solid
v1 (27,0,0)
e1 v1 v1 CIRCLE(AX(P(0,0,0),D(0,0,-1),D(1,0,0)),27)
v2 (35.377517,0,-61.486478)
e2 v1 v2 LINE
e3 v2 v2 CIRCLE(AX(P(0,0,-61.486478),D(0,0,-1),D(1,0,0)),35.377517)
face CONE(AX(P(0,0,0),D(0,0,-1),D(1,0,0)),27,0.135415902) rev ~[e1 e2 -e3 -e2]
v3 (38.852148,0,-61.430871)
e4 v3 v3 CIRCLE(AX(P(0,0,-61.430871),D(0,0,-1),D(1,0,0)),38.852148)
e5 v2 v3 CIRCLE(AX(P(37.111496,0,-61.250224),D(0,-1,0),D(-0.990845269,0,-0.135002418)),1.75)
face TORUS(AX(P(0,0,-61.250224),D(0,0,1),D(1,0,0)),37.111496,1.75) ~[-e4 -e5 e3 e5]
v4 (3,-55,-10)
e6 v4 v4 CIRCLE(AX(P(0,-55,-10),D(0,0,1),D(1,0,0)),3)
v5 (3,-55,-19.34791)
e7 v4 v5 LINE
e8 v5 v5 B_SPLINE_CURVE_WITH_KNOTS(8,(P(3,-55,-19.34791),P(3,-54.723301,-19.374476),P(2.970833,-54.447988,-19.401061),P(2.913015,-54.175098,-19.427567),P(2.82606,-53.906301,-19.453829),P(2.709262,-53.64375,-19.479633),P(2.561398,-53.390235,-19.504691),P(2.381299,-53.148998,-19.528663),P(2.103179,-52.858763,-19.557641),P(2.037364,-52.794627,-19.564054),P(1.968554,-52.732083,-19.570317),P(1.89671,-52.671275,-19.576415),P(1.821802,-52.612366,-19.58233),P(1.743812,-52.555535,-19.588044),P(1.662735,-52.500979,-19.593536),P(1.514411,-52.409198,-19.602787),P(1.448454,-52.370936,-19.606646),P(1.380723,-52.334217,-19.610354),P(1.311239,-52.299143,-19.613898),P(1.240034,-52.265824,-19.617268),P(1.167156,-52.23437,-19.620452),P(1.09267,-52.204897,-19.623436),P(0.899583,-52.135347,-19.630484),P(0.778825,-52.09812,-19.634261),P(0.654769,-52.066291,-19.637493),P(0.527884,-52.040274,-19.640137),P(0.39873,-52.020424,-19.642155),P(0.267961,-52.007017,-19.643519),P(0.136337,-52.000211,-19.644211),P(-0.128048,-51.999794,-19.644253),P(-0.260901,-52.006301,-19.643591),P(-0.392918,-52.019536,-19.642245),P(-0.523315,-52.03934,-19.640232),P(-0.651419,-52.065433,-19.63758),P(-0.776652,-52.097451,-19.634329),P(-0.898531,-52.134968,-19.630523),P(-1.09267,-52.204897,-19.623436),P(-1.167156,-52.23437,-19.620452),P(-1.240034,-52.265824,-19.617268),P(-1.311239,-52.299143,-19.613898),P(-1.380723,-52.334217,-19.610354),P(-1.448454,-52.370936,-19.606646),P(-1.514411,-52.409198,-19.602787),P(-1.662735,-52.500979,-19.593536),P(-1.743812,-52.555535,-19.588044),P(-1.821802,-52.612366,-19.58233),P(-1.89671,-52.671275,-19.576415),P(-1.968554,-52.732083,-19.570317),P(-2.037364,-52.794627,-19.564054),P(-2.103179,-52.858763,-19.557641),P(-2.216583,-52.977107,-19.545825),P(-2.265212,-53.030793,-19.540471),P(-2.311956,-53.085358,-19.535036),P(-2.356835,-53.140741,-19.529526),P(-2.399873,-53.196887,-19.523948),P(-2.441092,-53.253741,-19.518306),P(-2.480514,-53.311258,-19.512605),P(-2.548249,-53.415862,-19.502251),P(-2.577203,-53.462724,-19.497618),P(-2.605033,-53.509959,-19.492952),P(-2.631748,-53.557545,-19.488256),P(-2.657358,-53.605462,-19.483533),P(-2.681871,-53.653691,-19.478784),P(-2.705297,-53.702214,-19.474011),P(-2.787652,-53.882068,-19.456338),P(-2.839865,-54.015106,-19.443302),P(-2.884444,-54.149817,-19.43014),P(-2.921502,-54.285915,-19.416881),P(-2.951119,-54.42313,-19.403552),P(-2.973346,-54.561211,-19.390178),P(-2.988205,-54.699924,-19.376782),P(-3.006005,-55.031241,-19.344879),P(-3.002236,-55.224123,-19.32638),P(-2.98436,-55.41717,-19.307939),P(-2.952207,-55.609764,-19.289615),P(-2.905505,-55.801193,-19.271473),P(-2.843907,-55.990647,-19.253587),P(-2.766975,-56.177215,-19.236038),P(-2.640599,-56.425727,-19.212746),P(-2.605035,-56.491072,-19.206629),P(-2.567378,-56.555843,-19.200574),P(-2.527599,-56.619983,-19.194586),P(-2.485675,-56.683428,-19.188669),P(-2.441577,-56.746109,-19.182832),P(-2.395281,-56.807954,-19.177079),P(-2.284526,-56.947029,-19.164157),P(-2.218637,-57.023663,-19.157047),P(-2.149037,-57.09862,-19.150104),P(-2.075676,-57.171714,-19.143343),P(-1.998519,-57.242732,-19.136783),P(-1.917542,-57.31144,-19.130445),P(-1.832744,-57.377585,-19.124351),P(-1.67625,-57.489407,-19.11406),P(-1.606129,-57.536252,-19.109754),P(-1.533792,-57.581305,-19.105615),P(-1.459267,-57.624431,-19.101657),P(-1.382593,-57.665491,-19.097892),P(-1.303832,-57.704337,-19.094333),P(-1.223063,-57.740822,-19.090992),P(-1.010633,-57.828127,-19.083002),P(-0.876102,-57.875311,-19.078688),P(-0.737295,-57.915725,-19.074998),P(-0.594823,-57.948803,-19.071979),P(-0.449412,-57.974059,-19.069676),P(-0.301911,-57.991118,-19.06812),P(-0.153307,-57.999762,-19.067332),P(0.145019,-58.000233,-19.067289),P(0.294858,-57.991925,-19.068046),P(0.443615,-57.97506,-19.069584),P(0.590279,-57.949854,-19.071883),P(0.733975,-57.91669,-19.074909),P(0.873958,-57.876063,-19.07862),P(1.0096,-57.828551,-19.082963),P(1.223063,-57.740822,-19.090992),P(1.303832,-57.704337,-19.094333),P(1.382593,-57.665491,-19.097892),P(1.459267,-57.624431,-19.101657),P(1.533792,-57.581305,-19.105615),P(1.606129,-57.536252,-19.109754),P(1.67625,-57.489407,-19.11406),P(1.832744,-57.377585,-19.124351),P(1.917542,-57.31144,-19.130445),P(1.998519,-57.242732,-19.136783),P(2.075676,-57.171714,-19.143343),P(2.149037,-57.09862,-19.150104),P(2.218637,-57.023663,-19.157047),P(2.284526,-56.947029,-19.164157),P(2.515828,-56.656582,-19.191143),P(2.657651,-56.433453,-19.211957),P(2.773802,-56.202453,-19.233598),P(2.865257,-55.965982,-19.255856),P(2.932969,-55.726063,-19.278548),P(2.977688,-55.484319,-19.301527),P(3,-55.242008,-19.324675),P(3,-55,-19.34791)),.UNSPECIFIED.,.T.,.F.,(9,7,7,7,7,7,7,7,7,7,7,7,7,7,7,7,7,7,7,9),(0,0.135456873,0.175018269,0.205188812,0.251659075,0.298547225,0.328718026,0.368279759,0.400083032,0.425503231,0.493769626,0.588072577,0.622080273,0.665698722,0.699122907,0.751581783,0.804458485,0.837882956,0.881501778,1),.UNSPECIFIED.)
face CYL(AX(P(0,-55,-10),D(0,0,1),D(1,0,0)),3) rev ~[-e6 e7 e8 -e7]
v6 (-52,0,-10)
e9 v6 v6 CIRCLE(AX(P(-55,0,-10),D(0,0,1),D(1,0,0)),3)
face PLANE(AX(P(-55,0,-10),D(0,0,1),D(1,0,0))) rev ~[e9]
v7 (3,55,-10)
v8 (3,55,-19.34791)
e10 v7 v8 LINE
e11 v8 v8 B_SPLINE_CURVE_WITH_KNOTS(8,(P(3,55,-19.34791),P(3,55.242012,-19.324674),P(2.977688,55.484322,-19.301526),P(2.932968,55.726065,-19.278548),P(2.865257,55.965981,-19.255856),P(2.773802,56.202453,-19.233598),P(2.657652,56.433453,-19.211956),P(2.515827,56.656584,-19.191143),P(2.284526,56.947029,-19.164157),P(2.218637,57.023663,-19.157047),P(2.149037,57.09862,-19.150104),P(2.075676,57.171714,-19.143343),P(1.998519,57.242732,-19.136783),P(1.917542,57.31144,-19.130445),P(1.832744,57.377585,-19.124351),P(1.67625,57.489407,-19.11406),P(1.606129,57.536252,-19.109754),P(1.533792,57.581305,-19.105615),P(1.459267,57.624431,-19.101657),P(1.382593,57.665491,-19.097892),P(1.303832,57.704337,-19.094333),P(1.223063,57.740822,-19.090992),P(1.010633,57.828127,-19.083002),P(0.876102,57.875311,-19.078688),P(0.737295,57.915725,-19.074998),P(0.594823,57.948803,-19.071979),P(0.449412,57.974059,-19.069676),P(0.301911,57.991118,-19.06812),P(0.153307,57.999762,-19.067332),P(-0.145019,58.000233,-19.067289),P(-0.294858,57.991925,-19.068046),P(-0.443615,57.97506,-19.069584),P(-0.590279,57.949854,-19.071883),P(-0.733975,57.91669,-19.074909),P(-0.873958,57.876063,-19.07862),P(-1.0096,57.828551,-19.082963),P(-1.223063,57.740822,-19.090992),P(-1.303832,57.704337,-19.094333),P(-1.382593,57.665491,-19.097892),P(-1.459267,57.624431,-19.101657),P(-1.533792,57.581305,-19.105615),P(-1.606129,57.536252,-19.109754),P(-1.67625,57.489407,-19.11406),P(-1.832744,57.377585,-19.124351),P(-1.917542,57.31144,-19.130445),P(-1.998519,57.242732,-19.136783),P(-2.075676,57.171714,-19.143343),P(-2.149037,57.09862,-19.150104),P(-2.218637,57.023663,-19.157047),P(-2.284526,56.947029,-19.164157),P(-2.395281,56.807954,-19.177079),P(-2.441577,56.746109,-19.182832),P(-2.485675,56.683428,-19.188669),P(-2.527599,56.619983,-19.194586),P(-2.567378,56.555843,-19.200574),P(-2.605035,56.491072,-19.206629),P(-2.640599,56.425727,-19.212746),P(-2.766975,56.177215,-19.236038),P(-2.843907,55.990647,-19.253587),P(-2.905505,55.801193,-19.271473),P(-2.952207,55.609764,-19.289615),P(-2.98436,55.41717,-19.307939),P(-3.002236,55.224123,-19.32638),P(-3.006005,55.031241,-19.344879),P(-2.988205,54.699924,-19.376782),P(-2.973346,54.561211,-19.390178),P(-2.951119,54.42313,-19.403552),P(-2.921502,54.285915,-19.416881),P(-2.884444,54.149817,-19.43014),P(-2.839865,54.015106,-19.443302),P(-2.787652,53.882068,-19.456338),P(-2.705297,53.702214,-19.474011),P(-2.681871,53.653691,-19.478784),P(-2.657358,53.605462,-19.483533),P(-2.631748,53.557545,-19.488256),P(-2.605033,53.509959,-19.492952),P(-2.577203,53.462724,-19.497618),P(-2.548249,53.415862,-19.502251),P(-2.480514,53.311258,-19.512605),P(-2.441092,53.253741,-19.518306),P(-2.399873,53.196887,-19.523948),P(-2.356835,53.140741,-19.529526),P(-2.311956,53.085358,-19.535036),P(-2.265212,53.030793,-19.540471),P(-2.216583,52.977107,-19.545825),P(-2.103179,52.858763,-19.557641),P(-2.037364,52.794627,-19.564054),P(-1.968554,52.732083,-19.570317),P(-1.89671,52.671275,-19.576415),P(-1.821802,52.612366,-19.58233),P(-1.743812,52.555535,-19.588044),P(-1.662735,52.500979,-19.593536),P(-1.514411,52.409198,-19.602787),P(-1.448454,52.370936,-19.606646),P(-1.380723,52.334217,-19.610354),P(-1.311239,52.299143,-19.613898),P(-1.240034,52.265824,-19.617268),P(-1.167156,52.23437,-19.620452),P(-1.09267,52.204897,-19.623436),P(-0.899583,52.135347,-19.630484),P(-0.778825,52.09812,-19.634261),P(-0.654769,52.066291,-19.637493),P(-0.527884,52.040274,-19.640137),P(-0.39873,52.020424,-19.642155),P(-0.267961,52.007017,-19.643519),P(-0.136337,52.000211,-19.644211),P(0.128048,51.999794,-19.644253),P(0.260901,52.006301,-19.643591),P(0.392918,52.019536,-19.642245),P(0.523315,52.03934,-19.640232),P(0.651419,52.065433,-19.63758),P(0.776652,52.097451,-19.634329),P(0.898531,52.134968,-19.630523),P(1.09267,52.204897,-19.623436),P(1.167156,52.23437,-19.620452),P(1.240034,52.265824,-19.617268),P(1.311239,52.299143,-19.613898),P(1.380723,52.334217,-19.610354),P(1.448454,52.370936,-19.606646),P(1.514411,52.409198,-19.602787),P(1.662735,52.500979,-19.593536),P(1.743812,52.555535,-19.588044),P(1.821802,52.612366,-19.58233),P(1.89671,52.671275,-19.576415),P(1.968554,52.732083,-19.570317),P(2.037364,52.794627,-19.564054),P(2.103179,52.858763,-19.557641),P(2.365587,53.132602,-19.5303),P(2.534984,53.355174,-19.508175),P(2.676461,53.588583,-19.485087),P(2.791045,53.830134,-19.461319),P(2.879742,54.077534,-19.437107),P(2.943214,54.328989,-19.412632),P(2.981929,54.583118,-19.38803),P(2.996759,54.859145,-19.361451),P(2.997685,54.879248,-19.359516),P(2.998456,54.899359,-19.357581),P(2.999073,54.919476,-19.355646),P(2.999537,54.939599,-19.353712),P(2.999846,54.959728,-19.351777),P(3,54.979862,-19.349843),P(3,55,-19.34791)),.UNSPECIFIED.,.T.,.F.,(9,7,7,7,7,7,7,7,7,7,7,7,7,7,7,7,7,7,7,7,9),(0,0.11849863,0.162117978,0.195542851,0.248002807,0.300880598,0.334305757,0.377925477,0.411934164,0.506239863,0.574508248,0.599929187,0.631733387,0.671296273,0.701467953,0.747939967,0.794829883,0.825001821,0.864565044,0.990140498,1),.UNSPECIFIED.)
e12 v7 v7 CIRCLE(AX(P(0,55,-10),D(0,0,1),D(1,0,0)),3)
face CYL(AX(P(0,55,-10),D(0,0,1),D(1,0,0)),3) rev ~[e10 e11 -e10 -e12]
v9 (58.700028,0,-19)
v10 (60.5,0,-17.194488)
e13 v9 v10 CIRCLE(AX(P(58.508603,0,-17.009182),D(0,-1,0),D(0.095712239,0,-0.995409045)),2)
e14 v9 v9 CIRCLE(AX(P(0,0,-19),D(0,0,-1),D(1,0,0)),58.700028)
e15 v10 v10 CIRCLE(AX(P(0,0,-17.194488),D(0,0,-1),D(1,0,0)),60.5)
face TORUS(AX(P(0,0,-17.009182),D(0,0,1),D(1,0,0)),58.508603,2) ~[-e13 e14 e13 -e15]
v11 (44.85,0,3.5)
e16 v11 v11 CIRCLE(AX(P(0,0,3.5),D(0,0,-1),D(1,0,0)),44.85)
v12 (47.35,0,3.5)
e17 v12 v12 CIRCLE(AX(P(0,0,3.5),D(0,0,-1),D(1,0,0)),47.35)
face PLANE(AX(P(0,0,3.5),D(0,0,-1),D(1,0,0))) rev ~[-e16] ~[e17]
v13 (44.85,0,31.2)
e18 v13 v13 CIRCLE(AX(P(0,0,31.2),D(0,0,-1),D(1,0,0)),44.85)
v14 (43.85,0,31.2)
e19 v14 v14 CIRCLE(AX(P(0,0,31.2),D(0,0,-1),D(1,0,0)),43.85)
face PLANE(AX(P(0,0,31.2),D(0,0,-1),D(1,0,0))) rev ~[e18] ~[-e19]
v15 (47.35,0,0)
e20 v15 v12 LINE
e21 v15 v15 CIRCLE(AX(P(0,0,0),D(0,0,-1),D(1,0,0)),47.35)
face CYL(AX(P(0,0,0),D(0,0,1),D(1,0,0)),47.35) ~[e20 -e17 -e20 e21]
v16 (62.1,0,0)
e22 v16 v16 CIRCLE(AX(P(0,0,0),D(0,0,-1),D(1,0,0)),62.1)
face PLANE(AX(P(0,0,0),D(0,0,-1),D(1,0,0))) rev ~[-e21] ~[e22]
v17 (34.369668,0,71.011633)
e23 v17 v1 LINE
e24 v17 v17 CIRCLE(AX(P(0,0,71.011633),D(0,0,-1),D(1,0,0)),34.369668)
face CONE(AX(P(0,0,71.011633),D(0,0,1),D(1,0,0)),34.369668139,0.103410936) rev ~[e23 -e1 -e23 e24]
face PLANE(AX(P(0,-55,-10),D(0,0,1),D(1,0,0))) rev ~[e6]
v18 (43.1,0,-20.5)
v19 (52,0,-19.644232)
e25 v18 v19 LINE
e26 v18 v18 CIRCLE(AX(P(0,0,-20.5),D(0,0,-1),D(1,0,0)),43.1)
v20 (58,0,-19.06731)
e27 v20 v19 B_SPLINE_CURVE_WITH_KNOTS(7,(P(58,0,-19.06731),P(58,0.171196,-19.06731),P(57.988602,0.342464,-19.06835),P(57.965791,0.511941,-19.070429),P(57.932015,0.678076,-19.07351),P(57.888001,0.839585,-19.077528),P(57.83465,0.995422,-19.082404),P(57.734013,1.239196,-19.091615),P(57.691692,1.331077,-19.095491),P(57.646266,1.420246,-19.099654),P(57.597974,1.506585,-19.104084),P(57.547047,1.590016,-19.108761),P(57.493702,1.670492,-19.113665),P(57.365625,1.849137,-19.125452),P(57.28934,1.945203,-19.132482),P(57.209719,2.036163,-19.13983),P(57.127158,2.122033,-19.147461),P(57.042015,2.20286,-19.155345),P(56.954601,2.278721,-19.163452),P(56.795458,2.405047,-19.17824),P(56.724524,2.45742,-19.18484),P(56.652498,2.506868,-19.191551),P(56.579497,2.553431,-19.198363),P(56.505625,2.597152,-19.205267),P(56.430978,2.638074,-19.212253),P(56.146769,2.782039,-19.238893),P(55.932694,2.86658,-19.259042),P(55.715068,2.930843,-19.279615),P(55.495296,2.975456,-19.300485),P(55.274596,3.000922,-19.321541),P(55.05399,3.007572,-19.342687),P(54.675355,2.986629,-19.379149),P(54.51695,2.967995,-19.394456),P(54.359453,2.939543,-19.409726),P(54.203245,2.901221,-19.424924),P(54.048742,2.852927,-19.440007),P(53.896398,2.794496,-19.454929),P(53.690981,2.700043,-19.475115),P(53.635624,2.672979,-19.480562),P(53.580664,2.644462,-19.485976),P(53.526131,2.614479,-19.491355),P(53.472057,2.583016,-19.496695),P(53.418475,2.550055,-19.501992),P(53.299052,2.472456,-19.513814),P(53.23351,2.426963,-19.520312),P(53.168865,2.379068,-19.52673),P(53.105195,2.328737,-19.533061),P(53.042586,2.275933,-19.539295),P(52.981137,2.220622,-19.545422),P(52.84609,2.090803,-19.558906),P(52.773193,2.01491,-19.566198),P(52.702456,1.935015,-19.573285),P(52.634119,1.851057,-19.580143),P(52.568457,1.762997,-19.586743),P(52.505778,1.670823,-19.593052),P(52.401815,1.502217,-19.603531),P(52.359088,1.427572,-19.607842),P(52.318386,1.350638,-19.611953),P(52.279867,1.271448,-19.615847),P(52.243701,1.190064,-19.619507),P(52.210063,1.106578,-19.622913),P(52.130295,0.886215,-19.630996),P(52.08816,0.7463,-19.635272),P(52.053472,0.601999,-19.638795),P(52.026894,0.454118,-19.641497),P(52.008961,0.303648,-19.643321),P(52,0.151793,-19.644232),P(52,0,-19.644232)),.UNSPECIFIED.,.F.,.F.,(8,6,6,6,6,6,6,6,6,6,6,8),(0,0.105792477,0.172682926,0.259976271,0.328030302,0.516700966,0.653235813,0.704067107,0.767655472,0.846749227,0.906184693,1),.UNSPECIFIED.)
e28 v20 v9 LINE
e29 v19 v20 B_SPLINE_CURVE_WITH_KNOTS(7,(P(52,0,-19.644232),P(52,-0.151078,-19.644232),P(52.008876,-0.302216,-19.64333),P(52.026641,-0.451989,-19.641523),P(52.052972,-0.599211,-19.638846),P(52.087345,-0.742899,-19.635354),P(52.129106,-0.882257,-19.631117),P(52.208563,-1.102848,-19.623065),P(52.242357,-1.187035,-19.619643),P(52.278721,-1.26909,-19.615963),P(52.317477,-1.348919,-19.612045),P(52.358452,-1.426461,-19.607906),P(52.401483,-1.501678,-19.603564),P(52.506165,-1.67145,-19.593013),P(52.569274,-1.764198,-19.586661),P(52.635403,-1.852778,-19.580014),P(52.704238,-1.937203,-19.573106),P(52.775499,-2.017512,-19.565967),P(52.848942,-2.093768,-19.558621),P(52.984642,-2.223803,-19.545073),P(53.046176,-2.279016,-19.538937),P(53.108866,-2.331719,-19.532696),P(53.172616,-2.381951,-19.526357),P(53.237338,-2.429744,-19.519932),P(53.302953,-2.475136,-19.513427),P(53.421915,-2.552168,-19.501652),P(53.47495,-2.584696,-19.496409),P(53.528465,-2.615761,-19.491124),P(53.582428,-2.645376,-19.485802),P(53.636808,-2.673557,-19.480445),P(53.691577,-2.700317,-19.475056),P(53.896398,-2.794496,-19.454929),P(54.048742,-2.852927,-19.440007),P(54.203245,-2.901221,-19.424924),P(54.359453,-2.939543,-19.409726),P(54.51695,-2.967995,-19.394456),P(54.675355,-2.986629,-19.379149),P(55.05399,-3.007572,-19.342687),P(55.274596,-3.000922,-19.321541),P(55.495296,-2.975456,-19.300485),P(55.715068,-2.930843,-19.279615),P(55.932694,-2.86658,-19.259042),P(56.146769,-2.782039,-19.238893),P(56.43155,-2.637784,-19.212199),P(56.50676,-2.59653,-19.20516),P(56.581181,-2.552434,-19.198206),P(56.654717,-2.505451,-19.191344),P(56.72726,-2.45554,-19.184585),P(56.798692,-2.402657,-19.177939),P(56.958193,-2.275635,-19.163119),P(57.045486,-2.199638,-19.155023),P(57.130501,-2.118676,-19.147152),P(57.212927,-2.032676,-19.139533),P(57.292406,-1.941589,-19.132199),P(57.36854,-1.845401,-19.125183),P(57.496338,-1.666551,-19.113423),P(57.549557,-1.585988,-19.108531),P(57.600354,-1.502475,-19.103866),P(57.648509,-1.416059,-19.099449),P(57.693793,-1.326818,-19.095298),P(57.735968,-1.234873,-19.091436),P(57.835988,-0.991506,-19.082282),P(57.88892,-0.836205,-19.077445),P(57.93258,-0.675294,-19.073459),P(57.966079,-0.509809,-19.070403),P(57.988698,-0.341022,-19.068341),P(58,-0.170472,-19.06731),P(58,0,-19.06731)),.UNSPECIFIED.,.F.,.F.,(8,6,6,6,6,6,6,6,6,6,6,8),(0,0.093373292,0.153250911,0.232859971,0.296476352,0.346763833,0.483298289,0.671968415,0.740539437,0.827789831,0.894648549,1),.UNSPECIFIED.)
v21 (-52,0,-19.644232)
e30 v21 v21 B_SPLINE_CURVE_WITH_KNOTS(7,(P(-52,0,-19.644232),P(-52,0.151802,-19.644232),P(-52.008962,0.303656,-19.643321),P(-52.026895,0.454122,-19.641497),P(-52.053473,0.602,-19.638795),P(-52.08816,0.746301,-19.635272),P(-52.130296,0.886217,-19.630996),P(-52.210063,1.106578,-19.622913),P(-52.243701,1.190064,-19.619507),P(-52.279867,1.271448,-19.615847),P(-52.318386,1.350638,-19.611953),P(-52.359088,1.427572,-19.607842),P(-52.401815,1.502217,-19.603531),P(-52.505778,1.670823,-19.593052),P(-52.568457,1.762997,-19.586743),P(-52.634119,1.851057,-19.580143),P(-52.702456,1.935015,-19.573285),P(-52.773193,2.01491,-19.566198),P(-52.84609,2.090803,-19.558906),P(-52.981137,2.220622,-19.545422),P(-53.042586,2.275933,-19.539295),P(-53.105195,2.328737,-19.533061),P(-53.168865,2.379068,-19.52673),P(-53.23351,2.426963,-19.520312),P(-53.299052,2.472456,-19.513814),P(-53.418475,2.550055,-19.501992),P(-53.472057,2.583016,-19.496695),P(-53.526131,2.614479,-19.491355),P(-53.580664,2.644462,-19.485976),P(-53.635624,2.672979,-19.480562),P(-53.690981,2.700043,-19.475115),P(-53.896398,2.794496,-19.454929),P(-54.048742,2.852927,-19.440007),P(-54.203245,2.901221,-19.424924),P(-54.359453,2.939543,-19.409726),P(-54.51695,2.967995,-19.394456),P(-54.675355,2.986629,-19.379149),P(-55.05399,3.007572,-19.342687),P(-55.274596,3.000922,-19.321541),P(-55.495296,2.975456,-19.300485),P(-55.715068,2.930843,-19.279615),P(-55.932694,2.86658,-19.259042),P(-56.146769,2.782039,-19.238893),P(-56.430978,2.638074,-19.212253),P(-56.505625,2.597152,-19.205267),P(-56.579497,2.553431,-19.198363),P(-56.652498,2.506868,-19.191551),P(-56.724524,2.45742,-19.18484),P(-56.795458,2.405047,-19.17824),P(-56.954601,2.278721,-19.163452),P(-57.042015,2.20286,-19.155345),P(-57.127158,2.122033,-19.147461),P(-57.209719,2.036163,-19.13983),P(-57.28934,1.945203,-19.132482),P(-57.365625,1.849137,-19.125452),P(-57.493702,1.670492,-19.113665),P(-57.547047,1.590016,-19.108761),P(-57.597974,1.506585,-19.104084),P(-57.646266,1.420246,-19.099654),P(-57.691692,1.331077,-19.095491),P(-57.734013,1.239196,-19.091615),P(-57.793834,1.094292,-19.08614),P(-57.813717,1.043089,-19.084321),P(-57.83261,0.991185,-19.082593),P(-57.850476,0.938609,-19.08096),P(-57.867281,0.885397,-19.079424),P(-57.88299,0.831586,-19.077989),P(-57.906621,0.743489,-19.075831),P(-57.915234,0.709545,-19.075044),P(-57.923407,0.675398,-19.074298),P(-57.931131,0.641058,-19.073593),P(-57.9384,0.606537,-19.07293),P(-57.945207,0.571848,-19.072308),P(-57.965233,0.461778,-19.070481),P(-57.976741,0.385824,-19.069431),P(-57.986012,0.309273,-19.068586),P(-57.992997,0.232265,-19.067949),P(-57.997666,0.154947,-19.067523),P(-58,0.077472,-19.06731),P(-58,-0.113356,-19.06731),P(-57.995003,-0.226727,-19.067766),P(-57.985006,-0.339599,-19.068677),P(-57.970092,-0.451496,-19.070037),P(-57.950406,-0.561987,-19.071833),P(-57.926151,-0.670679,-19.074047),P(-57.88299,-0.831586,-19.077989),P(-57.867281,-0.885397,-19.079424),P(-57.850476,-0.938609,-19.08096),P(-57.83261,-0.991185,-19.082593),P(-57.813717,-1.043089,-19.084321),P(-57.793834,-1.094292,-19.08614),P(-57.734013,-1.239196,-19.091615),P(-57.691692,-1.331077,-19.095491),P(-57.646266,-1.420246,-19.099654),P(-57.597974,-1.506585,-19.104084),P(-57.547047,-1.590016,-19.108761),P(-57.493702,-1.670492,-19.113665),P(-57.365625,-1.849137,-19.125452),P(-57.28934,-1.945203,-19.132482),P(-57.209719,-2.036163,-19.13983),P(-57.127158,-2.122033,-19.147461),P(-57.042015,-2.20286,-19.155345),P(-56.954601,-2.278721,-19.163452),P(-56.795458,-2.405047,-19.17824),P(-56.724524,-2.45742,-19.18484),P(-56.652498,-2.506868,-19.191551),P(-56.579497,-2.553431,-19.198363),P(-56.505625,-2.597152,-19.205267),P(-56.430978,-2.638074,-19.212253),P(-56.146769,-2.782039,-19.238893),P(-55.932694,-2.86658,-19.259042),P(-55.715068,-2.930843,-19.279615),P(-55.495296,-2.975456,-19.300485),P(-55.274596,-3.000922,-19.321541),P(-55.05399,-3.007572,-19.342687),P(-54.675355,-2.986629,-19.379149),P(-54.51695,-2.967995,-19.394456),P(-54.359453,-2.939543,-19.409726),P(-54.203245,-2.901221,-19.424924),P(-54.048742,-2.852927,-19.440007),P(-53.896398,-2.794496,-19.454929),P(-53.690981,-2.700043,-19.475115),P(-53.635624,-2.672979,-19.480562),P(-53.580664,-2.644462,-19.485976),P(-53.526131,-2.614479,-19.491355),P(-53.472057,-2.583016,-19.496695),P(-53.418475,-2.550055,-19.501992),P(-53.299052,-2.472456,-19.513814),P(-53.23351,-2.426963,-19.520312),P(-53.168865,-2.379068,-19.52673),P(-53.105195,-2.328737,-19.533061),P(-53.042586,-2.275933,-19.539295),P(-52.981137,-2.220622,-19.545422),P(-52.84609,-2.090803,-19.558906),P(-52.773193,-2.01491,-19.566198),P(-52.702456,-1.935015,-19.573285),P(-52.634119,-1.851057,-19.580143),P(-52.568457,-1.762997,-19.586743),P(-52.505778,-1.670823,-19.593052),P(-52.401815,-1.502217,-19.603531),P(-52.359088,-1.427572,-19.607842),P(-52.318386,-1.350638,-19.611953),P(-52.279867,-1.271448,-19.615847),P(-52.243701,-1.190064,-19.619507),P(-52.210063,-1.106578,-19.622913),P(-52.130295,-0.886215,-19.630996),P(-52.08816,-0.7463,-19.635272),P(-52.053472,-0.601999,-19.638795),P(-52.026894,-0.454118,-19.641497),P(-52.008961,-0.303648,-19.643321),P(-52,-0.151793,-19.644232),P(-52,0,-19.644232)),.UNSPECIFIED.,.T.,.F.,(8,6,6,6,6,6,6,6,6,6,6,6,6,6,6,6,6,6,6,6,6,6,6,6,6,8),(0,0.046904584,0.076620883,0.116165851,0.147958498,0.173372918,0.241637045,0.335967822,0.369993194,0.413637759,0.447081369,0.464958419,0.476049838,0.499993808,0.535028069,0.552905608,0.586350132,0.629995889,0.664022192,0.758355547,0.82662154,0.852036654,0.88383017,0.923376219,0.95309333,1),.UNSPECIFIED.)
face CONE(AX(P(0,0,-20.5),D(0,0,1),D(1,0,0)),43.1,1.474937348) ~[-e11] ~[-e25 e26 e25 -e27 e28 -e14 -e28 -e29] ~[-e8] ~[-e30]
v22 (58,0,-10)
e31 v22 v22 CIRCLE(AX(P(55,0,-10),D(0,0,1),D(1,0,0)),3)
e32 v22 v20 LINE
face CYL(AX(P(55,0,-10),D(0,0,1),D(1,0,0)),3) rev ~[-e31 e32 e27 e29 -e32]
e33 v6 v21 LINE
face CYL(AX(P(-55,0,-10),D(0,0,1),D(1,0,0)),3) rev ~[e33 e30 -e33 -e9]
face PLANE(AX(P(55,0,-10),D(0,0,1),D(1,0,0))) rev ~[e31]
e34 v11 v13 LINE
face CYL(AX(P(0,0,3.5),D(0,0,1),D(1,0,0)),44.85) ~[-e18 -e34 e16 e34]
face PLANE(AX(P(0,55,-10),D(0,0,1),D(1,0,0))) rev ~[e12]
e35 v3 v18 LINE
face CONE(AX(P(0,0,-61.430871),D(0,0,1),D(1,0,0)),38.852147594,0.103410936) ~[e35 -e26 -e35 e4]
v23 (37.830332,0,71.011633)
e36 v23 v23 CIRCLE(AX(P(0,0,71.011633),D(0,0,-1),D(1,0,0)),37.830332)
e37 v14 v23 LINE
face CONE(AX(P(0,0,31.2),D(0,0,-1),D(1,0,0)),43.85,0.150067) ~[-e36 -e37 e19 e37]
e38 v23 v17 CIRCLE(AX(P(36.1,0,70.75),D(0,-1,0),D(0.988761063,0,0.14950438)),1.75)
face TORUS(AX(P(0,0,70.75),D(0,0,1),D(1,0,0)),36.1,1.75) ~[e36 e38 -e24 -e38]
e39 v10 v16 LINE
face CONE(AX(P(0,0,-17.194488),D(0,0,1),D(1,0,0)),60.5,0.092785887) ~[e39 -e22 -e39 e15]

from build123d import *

# Parameters (mm, degrees)
F3_START = -10
F2_R     = 3
F3_DEPTH = 20


with BuildPart() as f1:
    # F0 (on Front) → F1 (revolve)
    with BuildSketch(Plane.XZ):
        with BuildLine():
            Line((62.1, 0), (47.35, 0))
            Line((47.35, 0), (47.35, 3.5))
            Line((47.35, 3.5), (44.85, 3.5))
            Line((44.85, 3.5), (44.85, 31.2))
            Line((44.85, 31.2), (43.85, 31.2))
            Line((43.85, 31.2), (37.8303318608, 71.0116326655))
            ThreePointArc((37.8303318608, 71.0116326655), (36.1, 72.5), (34.3696681392, 71.0116326655))
            Line((34.3696681392, 71.0116326655), (27, 0))
            Line((27, 0), (35.3775171312, -61.4864782954))
            ThreePointArc((35.3775171312, -61.4864782954), (37.1394995022, -63), (38.8521475937, -61.4308708337))
            Line((38.8521475937, -61.4308708337), (43.1, -20.5))
            Line((43.1, -20.5), (58.7000275247, -19))
            ThreePointArc((58.7000275247, -19), (59.9249879423, -18.4212207992), (60.5, -17.194487527))
            Line((60.5, -17.194487527), (62.1, 0))
        make_face()
    revolve(axis=Axis((0, 0, -1.9075102699), (0, 0, -1)))

    # F2 (on Top) → F3 (cut)
    with BuildSketch(Plane.XY.offset(F3_START)):
        with Locations((0, 55)):
            Circle(F2_R)
        with Locations((-55, 0)):
            Circle(F2_R)
        with Locations((55, 0)):
            Circle(F2_R)
        with Locations((0, -55)):
            Circle(F2_R)
    extrude(amount=-F3_DEPTH, mode=Mode.SUBTRACT)


solid = f1.part
